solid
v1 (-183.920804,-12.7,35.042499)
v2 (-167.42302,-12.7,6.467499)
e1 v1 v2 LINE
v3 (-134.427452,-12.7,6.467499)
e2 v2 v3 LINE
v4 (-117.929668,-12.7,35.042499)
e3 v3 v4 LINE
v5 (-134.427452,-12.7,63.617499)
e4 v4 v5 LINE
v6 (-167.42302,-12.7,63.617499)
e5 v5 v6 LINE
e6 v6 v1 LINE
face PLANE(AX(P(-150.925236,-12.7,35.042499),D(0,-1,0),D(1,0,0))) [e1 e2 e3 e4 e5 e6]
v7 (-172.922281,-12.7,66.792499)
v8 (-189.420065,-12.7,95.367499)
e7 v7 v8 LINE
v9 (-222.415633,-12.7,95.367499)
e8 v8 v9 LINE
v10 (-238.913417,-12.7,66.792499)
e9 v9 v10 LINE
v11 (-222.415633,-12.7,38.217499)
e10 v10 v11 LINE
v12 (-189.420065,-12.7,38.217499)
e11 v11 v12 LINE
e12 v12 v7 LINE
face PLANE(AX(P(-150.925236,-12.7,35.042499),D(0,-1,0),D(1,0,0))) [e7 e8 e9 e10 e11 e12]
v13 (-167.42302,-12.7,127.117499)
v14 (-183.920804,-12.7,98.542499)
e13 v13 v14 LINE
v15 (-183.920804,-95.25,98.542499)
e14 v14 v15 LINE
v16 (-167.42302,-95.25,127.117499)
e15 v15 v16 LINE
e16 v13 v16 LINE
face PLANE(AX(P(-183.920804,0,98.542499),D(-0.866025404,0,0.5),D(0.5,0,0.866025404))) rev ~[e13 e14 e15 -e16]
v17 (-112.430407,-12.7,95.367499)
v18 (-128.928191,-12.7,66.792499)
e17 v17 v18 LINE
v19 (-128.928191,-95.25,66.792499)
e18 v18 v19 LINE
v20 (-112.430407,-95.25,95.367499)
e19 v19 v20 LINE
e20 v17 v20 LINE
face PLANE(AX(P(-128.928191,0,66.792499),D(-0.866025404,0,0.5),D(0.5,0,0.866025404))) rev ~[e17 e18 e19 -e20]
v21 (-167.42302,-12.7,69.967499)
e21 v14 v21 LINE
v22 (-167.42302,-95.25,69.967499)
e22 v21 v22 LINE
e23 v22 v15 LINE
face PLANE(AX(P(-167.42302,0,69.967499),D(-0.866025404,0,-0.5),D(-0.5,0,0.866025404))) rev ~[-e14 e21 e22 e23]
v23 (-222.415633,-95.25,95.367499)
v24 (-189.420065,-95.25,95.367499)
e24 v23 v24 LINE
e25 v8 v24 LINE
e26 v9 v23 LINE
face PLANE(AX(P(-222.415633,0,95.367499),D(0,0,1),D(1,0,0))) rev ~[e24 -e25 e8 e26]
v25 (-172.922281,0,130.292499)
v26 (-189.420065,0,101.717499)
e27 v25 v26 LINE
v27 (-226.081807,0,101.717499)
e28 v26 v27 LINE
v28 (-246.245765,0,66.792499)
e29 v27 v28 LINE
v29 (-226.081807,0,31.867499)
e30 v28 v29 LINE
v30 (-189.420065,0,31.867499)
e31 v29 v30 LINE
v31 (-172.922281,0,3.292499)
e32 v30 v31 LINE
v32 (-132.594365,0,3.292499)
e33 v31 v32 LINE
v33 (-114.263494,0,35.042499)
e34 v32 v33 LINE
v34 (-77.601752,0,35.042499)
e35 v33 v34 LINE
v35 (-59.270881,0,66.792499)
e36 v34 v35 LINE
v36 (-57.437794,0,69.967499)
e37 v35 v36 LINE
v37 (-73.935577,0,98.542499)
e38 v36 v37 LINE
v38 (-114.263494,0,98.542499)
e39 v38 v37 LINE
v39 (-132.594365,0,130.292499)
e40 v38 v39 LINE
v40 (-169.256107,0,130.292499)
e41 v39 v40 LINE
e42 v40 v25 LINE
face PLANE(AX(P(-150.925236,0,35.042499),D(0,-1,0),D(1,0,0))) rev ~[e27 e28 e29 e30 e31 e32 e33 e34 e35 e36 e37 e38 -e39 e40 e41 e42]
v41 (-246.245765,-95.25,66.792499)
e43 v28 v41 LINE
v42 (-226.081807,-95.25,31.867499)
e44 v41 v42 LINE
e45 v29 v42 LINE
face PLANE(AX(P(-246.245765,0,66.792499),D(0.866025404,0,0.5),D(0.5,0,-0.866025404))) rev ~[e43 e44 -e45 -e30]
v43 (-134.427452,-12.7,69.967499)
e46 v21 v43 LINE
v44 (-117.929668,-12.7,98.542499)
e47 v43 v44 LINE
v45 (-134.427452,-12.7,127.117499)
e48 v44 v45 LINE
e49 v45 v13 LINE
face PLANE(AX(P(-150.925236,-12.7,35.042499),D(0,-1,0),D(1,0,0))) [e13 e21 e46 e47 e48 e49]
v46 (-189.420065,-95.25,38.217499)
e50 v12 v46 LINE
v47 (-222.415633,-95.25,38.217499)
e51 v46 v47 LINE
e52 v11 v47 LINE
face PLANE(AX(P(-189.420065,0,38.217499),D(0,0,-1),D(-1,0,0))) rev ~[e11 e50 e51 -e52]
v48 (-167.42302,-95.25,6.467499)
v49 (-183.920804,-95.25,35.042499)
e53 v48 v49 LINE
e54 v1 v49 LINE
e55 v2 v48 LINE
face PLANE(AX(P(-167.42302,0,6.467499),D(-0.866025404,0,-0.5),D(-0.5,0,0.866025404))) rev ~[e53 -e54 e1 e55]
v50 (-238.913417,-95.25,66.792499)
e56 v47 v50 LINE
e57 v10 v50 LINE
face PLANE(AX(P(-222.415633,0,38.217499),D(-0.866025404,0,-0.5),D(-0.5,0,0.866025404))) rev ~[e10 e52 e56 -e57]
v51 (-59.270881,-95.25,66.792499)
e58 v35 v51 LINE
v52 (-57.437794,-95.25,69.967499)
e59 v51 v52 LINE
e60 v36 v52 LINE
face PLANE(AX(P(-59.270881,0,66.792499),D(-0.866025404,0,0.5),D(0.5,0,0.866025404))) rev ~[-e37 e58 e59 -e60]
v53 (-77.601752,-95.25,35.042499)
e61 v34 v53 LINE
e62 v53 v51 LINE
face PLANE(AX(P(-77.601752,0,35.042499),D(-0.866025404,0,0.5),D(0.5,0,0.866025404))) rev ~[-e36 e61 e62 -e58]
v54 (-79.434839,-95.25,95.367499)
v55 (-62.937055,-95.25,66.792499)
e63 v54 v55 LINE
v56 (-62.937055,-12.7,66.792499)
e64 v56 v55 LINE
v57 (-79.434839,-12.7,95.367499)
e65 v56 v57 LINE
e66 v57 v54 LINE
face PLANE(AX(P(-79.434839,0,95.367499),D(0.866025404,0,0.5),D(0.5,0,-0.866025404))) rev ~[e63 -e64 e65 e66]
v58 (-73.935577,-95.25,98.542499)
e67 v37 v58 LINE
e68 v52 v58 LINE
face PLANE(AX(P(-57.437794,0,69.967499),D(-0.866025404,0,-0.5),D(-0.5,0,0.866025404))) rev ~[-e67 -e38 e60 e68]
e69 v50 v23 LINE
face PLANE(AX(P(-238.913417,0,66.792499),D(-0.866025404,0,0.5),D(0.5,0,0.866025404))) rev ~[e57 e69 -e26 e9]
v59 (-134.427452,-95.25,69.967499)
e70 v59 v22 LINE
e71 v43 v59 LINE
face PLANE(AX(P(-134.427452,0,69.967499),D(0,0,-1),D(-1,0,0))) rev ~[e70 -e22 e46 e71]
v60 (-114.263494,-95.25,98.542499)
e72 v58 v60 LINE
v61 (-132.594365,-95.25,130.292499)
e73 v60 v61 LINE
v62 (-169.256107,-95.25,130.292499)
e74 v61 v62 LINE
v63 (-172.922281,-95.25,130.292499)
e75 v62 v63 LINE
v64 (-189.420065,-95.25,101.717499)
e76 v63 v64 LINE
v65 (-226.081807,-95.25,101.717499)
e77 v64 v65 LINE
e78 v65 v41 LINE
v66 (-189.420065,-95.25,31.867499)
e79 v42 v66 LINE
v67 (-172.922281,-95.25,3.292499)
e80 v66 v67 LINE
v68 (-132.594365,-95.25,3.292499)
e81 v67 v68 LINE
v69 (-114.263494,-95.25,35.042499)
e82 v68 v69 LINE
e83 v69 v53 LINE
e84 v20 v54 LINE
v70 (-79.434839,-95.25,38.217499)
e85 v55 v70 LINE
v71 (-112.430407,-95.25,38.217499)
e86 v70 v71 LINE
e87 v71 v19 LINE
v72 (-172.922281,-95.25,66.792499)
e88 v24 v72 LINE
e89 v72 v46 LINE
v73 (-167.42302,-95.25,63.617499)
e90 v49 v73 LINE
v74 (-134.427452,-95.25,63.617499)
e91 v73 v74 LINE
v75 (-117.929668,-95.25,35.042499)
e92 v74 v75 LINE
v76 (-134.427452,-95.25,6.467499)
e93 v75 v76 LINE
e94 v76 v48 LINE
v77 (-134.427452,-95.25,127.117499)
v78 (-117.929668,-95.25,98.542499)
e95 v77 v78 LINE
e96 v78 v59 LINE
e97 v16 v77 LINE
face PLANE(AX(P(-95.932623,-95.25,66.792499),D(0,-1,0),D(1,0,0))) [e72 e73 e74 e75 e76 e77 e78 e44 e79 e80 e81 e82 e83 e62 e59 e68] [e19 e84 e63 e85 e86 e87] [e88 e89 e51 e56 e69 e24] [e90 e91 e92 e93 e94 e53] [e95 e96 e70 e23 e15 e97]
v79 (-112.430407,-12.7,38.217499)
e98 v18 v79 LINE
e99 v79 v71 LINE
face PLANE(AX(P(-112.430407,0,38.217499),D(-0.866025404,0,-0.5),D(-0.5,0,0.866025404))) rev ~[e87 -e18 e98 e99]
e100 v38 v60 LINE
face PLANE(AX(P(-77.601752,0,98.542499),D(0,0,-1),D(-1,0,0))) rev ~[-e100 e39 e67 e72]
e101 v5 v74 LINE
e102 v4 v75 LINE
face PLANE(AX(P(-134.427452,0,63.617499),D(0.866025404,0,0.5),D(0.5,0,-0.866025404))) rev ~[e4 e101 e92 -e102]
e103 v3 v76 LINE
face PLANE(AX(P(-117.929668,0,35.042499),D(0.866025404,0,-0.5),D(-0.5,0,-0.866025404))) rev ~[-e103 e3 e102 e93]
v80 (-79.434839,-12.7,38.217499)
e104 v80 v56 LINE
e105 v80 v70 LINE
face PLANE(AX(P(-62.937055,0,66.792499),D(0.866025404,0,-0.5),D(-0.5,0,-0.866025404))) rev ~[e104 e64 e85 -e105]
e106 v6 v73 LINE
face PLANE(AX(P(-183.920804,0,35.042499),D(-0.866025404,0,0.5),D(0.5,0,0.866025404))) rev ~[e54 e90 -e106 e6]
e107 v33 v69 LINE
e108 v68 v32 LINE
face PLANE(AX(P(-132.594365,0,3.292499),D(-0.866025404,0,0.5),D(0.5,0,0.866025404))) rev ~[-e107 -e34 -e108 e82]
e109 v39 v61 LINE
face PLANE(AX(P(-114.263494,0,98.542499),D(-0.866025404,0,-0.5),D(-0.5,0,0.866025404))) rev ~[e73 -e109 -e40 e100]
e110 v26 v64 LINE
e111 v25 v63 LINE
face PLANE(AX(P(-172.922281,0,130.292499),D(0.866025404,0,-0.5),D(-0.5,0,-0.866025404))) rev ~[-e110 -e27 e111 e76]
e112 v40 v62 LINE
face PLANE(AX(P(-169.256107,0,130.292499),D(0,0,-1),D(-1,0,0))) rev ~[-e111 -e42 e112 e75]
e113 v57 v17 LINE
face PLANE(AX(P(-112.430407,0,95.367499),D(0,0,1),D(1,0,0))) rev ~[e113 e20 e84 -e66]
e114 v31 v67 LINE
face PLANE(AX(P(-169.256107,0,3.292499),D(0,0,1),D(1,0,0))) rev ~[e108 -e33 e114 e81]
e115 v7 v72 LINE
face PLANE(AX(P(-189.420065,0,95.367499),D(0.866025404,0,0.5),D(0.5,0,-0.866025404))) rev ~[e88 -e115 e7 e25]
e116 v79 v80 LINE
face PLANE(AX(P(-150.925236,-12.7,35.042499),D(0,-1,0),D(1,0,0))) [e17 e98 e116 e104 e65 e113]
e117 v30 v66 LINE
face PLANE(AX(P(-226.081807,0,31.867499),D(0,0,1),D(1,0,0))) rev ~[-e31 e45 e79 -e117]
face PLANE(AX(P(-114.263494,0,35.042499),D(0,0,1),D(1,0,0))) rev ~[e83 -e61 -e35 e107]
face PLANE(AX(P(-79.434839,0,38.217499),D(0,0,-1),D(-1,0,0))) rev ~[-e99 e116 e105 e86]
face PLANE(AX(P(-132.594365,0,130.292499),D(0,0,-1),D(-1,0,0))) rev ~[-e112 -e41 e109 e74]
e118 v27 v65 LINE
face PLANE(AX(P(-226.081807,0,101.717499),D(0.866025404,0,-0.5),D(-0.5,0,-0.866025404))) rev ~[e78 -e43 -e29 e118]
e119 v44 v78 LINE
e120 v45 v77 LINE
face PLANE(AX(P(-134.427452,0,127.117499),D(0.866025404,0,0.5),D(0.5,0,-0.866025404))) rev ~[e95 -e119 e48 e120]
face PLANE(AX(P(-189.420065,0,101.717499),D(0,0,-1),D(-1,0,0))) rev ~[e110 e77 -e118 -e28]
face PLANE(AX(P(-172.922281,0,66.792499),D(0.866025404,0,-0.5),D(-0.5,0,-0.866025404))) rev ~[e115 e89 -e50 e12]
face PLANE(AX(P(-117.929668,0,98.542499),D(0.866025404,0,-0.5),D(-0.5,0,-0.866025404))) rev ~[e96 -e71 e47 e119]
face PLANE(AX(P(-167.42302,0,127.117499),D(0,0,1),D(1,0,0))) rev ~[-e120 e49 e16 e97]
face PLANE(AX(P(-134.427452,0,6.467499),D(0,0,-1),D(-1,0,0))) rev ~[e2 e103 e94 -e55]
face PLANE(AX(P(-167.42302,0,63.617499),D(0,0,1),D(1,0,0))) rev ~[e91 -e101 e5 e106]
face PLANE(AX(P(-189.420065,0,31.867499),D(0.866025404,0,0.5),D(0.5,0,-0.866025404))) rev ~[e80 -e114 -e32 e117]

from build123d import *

# Parameters (mm, degrees)
F1_DEPTH = 12.7
F2_DEPTH = 95.25


# Not quite as in the source:
# - a feature names something its author has since deleted; it is built from what else it names


with BuildPart() as f1:
    # F0 (on Front) → F1 (new body)
    with BuildSketch(Plane.XZ):
        Polygon((-132.5943648094, 3.2924993012), (-114.2634937626, 35.0424993012), (-132.5943648094, 66.7924993012), (-169.2561069029, 66.7924993012), (-187.5869779497, 35.0424993012), (-169.2561069029, 3.2924993012), align=None)
        Polygon((-167.4230197982, 6.4674993012), (-183.9208037403, 35.0424993012), (-167.4230197982, 63.6174993012), (-134.427451914, 63.6174993012), (-117.929667972, 35.0424993012), (-134.427451914, 6.4674993012), align=None, mode=Mode.SUBTRACT)
        Polygon((-114.2634937626, 35.0424993012), (-77.6017516691, 35.0424993012), (-59.2708806223, 66.7924993012), (-77.6017516691, 98.5424993012), (-114.2634937626, 98.5424993012), (-132.5943648094, 66.7924993012), align=None)
        Polygon((-112.4304066579, 38.2174993012), (-128.9281906, 66.7924993012), (-112.4304066579, 95.3674993012), (-79.4348387737, 95.3674993012), (-62.9370548316, 66.7924993012), (-79.4348387737, 38.2174993012), align=None, mode=Mode.SUBTRACT)
        Polygon((-169.2561069029, 66.7924993012), (-132.5943648094, 66.7924993012), (-114.2634937626, 98.5424993012), (-132.5943648094, 130.2924993012), (-169.2561069029, 130.2924993012), (-187.5869779497, 98.5424993012), align=None)
        Polygon((-167.4230197982, 69.9674993012), (-183.9208037403, 98.5424993012), (-167.4230197982, 127.1174993012), (-134.427451914, 127.1174993012), (-117.929667972, 98.5424993012), (-134.427451914, 69.9674993012), align=None, mode=Mode.SUBTRACT)
        Polygon((-187.5869779497, 35.0424993012), (-169.2561069029, 66.7924993012), (-187.5869779497, 98.5424993012), (-190.6410588775, 98.5424993012), (-224.2487200432, 98.5424993012), (-242.57959109, 66.7924993012), (-224.2487200432, 35.0424993012), (-221.8035396555, 35.0424993012), align=None)
        Polygon((-222.4156329385, 38.2174993012), (-238.9134168806, 66.7924993012), (-222.4156329385, 95.3674993012), (-189.4200650544, 95.3674993012), (-172.9222811123, 66.7924993012), (-189.4200650544, 38.2174993012), align=None, mode=Mode.SUBTRACT)
        Polygon((-222.4156329385, 95.3674993012), (-238.9134168806, 66.7924993012), (-222.4156329385, 38.2174993012), (-189.4200650544, 38.2174993012), (-172.9222811123, 66.7924993012), (-189.4200650544, 95.3674993012), align=None)
        Polygon((-167.4230197982, 127.1174993012), (-183.9208037403, 98.5424993012), (-167.4230197982, 69.9674993012), (-134.427451914, 69.9674993012), (-117.929667972, 98.5424993012), (-134.427451914, 127.1174993012), align=None)
        Polygon((-167.4230197982, 63.6174993012), (-183.9208037403, 35.0424993012), (-167.4230197982, 6.4674993012), (-134.427451914, 6.4674993012), (-117.929667972, 35.0424993012), (-134.427451914, 63.6174993012), align=None)
        Polygon((-112.4304066579, 95.3674993012), (-128.9281906, 66.7924993012), (-112.4304066579, 38.2174993012), (-79.4348387737, 38.2174993012), (-62.9370548316, 66.7924993012), (-79.4348387737, 95.3674993012), align=None)
    extrude(amount=F1_DEPTH)

    # F0 (on Front) → F2 (join)
    with BuildSketch(Plane.XZ):
        Polygon((-114.2634937626, 35.0424993012), (-77.6017516691, 35.0424993012), (-59.2708806223, 66.7924993012), (-77.6017516691, 98.5424993012), (-114.2634937626, 98.5424993012), (-132.5943648094, 66.7924993012), align=None)
        Polygon((-112.4304066579, 38.2174993012), (-128.9281906, 66.7924993012), (-112.4304066579, 95.3674993012), (-79.4348387737, 95.3674993012), (-62.9370548316, 66.7924993012), (-79.4348387737, 38.2174993012), align=None, mode=Mode.SUBTRACT)
        Polygon((-77.6017516691, 98.5424993012), (-59.2708806223, 66.7924993012), (-57.4377935176, 69.9674993012), (-73.9355774597, 98.5424993012), align=None)
        Polygon((-132.5943648094, 3.2924993012), (-114.2634937626, 35.0424993012), (-132.5943648094, 66.7924993012), (-169.2561069029, 66.7924993012), (-187.5869779497, 35.0424993012), (-169.2561069029, 3.2924993012), align=None)
        Polygon((-167.4230197982, 6.4674993012), (-183.9208037403, 35.0424993012), (-167.4230197982, 63.6174993012), (-134.427451914, 63.6174993012), (-117.929667972, 35.0424993012), (-134.427451914, 6.4674993012), align=None, mode=Mode.SUBTRACT)
        Polygon((-169.2561069029, 66.7924993012), (-132.5943648094, 66.7924993012), (-114.2634937626, 98.5424993012), (-132.5943648094, 130.2924993012), (-169.2561069029, 130.2924993012), (-187.5869779497, 98.5424993012), align=None)
        Polygon((-167.4230197982, 69.9674993012), (-183.9208037403, 98.5424993012), (-167.4230197982, 127.1174993012), (-134.427451914, 127.1174993012), (-117.929667972, 98.5424993012), (-134.427451914, 69.9674993012), align=None, mode=Mode.SUBTRACT)
        Polygon((-172.9222811123, 3.2924993012), (-169.2561069029, 3.2924993012), (-187.5869779497, 35.0424993012), (-221.8035396555, 35.0424993012), (-224.2487200432, 35.0424993012), (-242.57959109, 66.7924993012), (-224.2487200432, 98.5424993012), (-190.6410588775, 98.5424993012), (-187.5869779497, 98.5424993012), (-169.2561069029, 130.2924993012), (-172.9222811123, 130.2924993011), (-189.4200650544, 101.7174993012), (-226.0818071479, 101.7174993012), (-246.2457652993, 66.7924993012), (-226.0818071479, 31.8674993012), (-189.4200650544, 31.8674993012), align=None)
        Polygon((-187.5869779497, 35.0424993012), (-169.2561069029, 66.7924993012), (-187.5869779497, 98.5424993012), (-190.6410588775, 98.5424993012), (-224.2487200432, 98.5424993012), (-242.57959109, 66.7924993012), (-224.2487200432, 35.0424993012), (-221.8035396555, 35.0424993012), align=None)
        Polygon((-222.4156329385, 38.2174993012), (-238.9134168806, 66.7924993012), (-222.4156329385, 95.3674993012), (-189.4200650544, 95.3674993012), (-172.9222811123, 66.7924993012), (-189.4200650544, 38.2174993012), align=None, mode=Mode.SUBTRACT)
    extrude(amount=F2_DEPTH)


solid = f1.part
